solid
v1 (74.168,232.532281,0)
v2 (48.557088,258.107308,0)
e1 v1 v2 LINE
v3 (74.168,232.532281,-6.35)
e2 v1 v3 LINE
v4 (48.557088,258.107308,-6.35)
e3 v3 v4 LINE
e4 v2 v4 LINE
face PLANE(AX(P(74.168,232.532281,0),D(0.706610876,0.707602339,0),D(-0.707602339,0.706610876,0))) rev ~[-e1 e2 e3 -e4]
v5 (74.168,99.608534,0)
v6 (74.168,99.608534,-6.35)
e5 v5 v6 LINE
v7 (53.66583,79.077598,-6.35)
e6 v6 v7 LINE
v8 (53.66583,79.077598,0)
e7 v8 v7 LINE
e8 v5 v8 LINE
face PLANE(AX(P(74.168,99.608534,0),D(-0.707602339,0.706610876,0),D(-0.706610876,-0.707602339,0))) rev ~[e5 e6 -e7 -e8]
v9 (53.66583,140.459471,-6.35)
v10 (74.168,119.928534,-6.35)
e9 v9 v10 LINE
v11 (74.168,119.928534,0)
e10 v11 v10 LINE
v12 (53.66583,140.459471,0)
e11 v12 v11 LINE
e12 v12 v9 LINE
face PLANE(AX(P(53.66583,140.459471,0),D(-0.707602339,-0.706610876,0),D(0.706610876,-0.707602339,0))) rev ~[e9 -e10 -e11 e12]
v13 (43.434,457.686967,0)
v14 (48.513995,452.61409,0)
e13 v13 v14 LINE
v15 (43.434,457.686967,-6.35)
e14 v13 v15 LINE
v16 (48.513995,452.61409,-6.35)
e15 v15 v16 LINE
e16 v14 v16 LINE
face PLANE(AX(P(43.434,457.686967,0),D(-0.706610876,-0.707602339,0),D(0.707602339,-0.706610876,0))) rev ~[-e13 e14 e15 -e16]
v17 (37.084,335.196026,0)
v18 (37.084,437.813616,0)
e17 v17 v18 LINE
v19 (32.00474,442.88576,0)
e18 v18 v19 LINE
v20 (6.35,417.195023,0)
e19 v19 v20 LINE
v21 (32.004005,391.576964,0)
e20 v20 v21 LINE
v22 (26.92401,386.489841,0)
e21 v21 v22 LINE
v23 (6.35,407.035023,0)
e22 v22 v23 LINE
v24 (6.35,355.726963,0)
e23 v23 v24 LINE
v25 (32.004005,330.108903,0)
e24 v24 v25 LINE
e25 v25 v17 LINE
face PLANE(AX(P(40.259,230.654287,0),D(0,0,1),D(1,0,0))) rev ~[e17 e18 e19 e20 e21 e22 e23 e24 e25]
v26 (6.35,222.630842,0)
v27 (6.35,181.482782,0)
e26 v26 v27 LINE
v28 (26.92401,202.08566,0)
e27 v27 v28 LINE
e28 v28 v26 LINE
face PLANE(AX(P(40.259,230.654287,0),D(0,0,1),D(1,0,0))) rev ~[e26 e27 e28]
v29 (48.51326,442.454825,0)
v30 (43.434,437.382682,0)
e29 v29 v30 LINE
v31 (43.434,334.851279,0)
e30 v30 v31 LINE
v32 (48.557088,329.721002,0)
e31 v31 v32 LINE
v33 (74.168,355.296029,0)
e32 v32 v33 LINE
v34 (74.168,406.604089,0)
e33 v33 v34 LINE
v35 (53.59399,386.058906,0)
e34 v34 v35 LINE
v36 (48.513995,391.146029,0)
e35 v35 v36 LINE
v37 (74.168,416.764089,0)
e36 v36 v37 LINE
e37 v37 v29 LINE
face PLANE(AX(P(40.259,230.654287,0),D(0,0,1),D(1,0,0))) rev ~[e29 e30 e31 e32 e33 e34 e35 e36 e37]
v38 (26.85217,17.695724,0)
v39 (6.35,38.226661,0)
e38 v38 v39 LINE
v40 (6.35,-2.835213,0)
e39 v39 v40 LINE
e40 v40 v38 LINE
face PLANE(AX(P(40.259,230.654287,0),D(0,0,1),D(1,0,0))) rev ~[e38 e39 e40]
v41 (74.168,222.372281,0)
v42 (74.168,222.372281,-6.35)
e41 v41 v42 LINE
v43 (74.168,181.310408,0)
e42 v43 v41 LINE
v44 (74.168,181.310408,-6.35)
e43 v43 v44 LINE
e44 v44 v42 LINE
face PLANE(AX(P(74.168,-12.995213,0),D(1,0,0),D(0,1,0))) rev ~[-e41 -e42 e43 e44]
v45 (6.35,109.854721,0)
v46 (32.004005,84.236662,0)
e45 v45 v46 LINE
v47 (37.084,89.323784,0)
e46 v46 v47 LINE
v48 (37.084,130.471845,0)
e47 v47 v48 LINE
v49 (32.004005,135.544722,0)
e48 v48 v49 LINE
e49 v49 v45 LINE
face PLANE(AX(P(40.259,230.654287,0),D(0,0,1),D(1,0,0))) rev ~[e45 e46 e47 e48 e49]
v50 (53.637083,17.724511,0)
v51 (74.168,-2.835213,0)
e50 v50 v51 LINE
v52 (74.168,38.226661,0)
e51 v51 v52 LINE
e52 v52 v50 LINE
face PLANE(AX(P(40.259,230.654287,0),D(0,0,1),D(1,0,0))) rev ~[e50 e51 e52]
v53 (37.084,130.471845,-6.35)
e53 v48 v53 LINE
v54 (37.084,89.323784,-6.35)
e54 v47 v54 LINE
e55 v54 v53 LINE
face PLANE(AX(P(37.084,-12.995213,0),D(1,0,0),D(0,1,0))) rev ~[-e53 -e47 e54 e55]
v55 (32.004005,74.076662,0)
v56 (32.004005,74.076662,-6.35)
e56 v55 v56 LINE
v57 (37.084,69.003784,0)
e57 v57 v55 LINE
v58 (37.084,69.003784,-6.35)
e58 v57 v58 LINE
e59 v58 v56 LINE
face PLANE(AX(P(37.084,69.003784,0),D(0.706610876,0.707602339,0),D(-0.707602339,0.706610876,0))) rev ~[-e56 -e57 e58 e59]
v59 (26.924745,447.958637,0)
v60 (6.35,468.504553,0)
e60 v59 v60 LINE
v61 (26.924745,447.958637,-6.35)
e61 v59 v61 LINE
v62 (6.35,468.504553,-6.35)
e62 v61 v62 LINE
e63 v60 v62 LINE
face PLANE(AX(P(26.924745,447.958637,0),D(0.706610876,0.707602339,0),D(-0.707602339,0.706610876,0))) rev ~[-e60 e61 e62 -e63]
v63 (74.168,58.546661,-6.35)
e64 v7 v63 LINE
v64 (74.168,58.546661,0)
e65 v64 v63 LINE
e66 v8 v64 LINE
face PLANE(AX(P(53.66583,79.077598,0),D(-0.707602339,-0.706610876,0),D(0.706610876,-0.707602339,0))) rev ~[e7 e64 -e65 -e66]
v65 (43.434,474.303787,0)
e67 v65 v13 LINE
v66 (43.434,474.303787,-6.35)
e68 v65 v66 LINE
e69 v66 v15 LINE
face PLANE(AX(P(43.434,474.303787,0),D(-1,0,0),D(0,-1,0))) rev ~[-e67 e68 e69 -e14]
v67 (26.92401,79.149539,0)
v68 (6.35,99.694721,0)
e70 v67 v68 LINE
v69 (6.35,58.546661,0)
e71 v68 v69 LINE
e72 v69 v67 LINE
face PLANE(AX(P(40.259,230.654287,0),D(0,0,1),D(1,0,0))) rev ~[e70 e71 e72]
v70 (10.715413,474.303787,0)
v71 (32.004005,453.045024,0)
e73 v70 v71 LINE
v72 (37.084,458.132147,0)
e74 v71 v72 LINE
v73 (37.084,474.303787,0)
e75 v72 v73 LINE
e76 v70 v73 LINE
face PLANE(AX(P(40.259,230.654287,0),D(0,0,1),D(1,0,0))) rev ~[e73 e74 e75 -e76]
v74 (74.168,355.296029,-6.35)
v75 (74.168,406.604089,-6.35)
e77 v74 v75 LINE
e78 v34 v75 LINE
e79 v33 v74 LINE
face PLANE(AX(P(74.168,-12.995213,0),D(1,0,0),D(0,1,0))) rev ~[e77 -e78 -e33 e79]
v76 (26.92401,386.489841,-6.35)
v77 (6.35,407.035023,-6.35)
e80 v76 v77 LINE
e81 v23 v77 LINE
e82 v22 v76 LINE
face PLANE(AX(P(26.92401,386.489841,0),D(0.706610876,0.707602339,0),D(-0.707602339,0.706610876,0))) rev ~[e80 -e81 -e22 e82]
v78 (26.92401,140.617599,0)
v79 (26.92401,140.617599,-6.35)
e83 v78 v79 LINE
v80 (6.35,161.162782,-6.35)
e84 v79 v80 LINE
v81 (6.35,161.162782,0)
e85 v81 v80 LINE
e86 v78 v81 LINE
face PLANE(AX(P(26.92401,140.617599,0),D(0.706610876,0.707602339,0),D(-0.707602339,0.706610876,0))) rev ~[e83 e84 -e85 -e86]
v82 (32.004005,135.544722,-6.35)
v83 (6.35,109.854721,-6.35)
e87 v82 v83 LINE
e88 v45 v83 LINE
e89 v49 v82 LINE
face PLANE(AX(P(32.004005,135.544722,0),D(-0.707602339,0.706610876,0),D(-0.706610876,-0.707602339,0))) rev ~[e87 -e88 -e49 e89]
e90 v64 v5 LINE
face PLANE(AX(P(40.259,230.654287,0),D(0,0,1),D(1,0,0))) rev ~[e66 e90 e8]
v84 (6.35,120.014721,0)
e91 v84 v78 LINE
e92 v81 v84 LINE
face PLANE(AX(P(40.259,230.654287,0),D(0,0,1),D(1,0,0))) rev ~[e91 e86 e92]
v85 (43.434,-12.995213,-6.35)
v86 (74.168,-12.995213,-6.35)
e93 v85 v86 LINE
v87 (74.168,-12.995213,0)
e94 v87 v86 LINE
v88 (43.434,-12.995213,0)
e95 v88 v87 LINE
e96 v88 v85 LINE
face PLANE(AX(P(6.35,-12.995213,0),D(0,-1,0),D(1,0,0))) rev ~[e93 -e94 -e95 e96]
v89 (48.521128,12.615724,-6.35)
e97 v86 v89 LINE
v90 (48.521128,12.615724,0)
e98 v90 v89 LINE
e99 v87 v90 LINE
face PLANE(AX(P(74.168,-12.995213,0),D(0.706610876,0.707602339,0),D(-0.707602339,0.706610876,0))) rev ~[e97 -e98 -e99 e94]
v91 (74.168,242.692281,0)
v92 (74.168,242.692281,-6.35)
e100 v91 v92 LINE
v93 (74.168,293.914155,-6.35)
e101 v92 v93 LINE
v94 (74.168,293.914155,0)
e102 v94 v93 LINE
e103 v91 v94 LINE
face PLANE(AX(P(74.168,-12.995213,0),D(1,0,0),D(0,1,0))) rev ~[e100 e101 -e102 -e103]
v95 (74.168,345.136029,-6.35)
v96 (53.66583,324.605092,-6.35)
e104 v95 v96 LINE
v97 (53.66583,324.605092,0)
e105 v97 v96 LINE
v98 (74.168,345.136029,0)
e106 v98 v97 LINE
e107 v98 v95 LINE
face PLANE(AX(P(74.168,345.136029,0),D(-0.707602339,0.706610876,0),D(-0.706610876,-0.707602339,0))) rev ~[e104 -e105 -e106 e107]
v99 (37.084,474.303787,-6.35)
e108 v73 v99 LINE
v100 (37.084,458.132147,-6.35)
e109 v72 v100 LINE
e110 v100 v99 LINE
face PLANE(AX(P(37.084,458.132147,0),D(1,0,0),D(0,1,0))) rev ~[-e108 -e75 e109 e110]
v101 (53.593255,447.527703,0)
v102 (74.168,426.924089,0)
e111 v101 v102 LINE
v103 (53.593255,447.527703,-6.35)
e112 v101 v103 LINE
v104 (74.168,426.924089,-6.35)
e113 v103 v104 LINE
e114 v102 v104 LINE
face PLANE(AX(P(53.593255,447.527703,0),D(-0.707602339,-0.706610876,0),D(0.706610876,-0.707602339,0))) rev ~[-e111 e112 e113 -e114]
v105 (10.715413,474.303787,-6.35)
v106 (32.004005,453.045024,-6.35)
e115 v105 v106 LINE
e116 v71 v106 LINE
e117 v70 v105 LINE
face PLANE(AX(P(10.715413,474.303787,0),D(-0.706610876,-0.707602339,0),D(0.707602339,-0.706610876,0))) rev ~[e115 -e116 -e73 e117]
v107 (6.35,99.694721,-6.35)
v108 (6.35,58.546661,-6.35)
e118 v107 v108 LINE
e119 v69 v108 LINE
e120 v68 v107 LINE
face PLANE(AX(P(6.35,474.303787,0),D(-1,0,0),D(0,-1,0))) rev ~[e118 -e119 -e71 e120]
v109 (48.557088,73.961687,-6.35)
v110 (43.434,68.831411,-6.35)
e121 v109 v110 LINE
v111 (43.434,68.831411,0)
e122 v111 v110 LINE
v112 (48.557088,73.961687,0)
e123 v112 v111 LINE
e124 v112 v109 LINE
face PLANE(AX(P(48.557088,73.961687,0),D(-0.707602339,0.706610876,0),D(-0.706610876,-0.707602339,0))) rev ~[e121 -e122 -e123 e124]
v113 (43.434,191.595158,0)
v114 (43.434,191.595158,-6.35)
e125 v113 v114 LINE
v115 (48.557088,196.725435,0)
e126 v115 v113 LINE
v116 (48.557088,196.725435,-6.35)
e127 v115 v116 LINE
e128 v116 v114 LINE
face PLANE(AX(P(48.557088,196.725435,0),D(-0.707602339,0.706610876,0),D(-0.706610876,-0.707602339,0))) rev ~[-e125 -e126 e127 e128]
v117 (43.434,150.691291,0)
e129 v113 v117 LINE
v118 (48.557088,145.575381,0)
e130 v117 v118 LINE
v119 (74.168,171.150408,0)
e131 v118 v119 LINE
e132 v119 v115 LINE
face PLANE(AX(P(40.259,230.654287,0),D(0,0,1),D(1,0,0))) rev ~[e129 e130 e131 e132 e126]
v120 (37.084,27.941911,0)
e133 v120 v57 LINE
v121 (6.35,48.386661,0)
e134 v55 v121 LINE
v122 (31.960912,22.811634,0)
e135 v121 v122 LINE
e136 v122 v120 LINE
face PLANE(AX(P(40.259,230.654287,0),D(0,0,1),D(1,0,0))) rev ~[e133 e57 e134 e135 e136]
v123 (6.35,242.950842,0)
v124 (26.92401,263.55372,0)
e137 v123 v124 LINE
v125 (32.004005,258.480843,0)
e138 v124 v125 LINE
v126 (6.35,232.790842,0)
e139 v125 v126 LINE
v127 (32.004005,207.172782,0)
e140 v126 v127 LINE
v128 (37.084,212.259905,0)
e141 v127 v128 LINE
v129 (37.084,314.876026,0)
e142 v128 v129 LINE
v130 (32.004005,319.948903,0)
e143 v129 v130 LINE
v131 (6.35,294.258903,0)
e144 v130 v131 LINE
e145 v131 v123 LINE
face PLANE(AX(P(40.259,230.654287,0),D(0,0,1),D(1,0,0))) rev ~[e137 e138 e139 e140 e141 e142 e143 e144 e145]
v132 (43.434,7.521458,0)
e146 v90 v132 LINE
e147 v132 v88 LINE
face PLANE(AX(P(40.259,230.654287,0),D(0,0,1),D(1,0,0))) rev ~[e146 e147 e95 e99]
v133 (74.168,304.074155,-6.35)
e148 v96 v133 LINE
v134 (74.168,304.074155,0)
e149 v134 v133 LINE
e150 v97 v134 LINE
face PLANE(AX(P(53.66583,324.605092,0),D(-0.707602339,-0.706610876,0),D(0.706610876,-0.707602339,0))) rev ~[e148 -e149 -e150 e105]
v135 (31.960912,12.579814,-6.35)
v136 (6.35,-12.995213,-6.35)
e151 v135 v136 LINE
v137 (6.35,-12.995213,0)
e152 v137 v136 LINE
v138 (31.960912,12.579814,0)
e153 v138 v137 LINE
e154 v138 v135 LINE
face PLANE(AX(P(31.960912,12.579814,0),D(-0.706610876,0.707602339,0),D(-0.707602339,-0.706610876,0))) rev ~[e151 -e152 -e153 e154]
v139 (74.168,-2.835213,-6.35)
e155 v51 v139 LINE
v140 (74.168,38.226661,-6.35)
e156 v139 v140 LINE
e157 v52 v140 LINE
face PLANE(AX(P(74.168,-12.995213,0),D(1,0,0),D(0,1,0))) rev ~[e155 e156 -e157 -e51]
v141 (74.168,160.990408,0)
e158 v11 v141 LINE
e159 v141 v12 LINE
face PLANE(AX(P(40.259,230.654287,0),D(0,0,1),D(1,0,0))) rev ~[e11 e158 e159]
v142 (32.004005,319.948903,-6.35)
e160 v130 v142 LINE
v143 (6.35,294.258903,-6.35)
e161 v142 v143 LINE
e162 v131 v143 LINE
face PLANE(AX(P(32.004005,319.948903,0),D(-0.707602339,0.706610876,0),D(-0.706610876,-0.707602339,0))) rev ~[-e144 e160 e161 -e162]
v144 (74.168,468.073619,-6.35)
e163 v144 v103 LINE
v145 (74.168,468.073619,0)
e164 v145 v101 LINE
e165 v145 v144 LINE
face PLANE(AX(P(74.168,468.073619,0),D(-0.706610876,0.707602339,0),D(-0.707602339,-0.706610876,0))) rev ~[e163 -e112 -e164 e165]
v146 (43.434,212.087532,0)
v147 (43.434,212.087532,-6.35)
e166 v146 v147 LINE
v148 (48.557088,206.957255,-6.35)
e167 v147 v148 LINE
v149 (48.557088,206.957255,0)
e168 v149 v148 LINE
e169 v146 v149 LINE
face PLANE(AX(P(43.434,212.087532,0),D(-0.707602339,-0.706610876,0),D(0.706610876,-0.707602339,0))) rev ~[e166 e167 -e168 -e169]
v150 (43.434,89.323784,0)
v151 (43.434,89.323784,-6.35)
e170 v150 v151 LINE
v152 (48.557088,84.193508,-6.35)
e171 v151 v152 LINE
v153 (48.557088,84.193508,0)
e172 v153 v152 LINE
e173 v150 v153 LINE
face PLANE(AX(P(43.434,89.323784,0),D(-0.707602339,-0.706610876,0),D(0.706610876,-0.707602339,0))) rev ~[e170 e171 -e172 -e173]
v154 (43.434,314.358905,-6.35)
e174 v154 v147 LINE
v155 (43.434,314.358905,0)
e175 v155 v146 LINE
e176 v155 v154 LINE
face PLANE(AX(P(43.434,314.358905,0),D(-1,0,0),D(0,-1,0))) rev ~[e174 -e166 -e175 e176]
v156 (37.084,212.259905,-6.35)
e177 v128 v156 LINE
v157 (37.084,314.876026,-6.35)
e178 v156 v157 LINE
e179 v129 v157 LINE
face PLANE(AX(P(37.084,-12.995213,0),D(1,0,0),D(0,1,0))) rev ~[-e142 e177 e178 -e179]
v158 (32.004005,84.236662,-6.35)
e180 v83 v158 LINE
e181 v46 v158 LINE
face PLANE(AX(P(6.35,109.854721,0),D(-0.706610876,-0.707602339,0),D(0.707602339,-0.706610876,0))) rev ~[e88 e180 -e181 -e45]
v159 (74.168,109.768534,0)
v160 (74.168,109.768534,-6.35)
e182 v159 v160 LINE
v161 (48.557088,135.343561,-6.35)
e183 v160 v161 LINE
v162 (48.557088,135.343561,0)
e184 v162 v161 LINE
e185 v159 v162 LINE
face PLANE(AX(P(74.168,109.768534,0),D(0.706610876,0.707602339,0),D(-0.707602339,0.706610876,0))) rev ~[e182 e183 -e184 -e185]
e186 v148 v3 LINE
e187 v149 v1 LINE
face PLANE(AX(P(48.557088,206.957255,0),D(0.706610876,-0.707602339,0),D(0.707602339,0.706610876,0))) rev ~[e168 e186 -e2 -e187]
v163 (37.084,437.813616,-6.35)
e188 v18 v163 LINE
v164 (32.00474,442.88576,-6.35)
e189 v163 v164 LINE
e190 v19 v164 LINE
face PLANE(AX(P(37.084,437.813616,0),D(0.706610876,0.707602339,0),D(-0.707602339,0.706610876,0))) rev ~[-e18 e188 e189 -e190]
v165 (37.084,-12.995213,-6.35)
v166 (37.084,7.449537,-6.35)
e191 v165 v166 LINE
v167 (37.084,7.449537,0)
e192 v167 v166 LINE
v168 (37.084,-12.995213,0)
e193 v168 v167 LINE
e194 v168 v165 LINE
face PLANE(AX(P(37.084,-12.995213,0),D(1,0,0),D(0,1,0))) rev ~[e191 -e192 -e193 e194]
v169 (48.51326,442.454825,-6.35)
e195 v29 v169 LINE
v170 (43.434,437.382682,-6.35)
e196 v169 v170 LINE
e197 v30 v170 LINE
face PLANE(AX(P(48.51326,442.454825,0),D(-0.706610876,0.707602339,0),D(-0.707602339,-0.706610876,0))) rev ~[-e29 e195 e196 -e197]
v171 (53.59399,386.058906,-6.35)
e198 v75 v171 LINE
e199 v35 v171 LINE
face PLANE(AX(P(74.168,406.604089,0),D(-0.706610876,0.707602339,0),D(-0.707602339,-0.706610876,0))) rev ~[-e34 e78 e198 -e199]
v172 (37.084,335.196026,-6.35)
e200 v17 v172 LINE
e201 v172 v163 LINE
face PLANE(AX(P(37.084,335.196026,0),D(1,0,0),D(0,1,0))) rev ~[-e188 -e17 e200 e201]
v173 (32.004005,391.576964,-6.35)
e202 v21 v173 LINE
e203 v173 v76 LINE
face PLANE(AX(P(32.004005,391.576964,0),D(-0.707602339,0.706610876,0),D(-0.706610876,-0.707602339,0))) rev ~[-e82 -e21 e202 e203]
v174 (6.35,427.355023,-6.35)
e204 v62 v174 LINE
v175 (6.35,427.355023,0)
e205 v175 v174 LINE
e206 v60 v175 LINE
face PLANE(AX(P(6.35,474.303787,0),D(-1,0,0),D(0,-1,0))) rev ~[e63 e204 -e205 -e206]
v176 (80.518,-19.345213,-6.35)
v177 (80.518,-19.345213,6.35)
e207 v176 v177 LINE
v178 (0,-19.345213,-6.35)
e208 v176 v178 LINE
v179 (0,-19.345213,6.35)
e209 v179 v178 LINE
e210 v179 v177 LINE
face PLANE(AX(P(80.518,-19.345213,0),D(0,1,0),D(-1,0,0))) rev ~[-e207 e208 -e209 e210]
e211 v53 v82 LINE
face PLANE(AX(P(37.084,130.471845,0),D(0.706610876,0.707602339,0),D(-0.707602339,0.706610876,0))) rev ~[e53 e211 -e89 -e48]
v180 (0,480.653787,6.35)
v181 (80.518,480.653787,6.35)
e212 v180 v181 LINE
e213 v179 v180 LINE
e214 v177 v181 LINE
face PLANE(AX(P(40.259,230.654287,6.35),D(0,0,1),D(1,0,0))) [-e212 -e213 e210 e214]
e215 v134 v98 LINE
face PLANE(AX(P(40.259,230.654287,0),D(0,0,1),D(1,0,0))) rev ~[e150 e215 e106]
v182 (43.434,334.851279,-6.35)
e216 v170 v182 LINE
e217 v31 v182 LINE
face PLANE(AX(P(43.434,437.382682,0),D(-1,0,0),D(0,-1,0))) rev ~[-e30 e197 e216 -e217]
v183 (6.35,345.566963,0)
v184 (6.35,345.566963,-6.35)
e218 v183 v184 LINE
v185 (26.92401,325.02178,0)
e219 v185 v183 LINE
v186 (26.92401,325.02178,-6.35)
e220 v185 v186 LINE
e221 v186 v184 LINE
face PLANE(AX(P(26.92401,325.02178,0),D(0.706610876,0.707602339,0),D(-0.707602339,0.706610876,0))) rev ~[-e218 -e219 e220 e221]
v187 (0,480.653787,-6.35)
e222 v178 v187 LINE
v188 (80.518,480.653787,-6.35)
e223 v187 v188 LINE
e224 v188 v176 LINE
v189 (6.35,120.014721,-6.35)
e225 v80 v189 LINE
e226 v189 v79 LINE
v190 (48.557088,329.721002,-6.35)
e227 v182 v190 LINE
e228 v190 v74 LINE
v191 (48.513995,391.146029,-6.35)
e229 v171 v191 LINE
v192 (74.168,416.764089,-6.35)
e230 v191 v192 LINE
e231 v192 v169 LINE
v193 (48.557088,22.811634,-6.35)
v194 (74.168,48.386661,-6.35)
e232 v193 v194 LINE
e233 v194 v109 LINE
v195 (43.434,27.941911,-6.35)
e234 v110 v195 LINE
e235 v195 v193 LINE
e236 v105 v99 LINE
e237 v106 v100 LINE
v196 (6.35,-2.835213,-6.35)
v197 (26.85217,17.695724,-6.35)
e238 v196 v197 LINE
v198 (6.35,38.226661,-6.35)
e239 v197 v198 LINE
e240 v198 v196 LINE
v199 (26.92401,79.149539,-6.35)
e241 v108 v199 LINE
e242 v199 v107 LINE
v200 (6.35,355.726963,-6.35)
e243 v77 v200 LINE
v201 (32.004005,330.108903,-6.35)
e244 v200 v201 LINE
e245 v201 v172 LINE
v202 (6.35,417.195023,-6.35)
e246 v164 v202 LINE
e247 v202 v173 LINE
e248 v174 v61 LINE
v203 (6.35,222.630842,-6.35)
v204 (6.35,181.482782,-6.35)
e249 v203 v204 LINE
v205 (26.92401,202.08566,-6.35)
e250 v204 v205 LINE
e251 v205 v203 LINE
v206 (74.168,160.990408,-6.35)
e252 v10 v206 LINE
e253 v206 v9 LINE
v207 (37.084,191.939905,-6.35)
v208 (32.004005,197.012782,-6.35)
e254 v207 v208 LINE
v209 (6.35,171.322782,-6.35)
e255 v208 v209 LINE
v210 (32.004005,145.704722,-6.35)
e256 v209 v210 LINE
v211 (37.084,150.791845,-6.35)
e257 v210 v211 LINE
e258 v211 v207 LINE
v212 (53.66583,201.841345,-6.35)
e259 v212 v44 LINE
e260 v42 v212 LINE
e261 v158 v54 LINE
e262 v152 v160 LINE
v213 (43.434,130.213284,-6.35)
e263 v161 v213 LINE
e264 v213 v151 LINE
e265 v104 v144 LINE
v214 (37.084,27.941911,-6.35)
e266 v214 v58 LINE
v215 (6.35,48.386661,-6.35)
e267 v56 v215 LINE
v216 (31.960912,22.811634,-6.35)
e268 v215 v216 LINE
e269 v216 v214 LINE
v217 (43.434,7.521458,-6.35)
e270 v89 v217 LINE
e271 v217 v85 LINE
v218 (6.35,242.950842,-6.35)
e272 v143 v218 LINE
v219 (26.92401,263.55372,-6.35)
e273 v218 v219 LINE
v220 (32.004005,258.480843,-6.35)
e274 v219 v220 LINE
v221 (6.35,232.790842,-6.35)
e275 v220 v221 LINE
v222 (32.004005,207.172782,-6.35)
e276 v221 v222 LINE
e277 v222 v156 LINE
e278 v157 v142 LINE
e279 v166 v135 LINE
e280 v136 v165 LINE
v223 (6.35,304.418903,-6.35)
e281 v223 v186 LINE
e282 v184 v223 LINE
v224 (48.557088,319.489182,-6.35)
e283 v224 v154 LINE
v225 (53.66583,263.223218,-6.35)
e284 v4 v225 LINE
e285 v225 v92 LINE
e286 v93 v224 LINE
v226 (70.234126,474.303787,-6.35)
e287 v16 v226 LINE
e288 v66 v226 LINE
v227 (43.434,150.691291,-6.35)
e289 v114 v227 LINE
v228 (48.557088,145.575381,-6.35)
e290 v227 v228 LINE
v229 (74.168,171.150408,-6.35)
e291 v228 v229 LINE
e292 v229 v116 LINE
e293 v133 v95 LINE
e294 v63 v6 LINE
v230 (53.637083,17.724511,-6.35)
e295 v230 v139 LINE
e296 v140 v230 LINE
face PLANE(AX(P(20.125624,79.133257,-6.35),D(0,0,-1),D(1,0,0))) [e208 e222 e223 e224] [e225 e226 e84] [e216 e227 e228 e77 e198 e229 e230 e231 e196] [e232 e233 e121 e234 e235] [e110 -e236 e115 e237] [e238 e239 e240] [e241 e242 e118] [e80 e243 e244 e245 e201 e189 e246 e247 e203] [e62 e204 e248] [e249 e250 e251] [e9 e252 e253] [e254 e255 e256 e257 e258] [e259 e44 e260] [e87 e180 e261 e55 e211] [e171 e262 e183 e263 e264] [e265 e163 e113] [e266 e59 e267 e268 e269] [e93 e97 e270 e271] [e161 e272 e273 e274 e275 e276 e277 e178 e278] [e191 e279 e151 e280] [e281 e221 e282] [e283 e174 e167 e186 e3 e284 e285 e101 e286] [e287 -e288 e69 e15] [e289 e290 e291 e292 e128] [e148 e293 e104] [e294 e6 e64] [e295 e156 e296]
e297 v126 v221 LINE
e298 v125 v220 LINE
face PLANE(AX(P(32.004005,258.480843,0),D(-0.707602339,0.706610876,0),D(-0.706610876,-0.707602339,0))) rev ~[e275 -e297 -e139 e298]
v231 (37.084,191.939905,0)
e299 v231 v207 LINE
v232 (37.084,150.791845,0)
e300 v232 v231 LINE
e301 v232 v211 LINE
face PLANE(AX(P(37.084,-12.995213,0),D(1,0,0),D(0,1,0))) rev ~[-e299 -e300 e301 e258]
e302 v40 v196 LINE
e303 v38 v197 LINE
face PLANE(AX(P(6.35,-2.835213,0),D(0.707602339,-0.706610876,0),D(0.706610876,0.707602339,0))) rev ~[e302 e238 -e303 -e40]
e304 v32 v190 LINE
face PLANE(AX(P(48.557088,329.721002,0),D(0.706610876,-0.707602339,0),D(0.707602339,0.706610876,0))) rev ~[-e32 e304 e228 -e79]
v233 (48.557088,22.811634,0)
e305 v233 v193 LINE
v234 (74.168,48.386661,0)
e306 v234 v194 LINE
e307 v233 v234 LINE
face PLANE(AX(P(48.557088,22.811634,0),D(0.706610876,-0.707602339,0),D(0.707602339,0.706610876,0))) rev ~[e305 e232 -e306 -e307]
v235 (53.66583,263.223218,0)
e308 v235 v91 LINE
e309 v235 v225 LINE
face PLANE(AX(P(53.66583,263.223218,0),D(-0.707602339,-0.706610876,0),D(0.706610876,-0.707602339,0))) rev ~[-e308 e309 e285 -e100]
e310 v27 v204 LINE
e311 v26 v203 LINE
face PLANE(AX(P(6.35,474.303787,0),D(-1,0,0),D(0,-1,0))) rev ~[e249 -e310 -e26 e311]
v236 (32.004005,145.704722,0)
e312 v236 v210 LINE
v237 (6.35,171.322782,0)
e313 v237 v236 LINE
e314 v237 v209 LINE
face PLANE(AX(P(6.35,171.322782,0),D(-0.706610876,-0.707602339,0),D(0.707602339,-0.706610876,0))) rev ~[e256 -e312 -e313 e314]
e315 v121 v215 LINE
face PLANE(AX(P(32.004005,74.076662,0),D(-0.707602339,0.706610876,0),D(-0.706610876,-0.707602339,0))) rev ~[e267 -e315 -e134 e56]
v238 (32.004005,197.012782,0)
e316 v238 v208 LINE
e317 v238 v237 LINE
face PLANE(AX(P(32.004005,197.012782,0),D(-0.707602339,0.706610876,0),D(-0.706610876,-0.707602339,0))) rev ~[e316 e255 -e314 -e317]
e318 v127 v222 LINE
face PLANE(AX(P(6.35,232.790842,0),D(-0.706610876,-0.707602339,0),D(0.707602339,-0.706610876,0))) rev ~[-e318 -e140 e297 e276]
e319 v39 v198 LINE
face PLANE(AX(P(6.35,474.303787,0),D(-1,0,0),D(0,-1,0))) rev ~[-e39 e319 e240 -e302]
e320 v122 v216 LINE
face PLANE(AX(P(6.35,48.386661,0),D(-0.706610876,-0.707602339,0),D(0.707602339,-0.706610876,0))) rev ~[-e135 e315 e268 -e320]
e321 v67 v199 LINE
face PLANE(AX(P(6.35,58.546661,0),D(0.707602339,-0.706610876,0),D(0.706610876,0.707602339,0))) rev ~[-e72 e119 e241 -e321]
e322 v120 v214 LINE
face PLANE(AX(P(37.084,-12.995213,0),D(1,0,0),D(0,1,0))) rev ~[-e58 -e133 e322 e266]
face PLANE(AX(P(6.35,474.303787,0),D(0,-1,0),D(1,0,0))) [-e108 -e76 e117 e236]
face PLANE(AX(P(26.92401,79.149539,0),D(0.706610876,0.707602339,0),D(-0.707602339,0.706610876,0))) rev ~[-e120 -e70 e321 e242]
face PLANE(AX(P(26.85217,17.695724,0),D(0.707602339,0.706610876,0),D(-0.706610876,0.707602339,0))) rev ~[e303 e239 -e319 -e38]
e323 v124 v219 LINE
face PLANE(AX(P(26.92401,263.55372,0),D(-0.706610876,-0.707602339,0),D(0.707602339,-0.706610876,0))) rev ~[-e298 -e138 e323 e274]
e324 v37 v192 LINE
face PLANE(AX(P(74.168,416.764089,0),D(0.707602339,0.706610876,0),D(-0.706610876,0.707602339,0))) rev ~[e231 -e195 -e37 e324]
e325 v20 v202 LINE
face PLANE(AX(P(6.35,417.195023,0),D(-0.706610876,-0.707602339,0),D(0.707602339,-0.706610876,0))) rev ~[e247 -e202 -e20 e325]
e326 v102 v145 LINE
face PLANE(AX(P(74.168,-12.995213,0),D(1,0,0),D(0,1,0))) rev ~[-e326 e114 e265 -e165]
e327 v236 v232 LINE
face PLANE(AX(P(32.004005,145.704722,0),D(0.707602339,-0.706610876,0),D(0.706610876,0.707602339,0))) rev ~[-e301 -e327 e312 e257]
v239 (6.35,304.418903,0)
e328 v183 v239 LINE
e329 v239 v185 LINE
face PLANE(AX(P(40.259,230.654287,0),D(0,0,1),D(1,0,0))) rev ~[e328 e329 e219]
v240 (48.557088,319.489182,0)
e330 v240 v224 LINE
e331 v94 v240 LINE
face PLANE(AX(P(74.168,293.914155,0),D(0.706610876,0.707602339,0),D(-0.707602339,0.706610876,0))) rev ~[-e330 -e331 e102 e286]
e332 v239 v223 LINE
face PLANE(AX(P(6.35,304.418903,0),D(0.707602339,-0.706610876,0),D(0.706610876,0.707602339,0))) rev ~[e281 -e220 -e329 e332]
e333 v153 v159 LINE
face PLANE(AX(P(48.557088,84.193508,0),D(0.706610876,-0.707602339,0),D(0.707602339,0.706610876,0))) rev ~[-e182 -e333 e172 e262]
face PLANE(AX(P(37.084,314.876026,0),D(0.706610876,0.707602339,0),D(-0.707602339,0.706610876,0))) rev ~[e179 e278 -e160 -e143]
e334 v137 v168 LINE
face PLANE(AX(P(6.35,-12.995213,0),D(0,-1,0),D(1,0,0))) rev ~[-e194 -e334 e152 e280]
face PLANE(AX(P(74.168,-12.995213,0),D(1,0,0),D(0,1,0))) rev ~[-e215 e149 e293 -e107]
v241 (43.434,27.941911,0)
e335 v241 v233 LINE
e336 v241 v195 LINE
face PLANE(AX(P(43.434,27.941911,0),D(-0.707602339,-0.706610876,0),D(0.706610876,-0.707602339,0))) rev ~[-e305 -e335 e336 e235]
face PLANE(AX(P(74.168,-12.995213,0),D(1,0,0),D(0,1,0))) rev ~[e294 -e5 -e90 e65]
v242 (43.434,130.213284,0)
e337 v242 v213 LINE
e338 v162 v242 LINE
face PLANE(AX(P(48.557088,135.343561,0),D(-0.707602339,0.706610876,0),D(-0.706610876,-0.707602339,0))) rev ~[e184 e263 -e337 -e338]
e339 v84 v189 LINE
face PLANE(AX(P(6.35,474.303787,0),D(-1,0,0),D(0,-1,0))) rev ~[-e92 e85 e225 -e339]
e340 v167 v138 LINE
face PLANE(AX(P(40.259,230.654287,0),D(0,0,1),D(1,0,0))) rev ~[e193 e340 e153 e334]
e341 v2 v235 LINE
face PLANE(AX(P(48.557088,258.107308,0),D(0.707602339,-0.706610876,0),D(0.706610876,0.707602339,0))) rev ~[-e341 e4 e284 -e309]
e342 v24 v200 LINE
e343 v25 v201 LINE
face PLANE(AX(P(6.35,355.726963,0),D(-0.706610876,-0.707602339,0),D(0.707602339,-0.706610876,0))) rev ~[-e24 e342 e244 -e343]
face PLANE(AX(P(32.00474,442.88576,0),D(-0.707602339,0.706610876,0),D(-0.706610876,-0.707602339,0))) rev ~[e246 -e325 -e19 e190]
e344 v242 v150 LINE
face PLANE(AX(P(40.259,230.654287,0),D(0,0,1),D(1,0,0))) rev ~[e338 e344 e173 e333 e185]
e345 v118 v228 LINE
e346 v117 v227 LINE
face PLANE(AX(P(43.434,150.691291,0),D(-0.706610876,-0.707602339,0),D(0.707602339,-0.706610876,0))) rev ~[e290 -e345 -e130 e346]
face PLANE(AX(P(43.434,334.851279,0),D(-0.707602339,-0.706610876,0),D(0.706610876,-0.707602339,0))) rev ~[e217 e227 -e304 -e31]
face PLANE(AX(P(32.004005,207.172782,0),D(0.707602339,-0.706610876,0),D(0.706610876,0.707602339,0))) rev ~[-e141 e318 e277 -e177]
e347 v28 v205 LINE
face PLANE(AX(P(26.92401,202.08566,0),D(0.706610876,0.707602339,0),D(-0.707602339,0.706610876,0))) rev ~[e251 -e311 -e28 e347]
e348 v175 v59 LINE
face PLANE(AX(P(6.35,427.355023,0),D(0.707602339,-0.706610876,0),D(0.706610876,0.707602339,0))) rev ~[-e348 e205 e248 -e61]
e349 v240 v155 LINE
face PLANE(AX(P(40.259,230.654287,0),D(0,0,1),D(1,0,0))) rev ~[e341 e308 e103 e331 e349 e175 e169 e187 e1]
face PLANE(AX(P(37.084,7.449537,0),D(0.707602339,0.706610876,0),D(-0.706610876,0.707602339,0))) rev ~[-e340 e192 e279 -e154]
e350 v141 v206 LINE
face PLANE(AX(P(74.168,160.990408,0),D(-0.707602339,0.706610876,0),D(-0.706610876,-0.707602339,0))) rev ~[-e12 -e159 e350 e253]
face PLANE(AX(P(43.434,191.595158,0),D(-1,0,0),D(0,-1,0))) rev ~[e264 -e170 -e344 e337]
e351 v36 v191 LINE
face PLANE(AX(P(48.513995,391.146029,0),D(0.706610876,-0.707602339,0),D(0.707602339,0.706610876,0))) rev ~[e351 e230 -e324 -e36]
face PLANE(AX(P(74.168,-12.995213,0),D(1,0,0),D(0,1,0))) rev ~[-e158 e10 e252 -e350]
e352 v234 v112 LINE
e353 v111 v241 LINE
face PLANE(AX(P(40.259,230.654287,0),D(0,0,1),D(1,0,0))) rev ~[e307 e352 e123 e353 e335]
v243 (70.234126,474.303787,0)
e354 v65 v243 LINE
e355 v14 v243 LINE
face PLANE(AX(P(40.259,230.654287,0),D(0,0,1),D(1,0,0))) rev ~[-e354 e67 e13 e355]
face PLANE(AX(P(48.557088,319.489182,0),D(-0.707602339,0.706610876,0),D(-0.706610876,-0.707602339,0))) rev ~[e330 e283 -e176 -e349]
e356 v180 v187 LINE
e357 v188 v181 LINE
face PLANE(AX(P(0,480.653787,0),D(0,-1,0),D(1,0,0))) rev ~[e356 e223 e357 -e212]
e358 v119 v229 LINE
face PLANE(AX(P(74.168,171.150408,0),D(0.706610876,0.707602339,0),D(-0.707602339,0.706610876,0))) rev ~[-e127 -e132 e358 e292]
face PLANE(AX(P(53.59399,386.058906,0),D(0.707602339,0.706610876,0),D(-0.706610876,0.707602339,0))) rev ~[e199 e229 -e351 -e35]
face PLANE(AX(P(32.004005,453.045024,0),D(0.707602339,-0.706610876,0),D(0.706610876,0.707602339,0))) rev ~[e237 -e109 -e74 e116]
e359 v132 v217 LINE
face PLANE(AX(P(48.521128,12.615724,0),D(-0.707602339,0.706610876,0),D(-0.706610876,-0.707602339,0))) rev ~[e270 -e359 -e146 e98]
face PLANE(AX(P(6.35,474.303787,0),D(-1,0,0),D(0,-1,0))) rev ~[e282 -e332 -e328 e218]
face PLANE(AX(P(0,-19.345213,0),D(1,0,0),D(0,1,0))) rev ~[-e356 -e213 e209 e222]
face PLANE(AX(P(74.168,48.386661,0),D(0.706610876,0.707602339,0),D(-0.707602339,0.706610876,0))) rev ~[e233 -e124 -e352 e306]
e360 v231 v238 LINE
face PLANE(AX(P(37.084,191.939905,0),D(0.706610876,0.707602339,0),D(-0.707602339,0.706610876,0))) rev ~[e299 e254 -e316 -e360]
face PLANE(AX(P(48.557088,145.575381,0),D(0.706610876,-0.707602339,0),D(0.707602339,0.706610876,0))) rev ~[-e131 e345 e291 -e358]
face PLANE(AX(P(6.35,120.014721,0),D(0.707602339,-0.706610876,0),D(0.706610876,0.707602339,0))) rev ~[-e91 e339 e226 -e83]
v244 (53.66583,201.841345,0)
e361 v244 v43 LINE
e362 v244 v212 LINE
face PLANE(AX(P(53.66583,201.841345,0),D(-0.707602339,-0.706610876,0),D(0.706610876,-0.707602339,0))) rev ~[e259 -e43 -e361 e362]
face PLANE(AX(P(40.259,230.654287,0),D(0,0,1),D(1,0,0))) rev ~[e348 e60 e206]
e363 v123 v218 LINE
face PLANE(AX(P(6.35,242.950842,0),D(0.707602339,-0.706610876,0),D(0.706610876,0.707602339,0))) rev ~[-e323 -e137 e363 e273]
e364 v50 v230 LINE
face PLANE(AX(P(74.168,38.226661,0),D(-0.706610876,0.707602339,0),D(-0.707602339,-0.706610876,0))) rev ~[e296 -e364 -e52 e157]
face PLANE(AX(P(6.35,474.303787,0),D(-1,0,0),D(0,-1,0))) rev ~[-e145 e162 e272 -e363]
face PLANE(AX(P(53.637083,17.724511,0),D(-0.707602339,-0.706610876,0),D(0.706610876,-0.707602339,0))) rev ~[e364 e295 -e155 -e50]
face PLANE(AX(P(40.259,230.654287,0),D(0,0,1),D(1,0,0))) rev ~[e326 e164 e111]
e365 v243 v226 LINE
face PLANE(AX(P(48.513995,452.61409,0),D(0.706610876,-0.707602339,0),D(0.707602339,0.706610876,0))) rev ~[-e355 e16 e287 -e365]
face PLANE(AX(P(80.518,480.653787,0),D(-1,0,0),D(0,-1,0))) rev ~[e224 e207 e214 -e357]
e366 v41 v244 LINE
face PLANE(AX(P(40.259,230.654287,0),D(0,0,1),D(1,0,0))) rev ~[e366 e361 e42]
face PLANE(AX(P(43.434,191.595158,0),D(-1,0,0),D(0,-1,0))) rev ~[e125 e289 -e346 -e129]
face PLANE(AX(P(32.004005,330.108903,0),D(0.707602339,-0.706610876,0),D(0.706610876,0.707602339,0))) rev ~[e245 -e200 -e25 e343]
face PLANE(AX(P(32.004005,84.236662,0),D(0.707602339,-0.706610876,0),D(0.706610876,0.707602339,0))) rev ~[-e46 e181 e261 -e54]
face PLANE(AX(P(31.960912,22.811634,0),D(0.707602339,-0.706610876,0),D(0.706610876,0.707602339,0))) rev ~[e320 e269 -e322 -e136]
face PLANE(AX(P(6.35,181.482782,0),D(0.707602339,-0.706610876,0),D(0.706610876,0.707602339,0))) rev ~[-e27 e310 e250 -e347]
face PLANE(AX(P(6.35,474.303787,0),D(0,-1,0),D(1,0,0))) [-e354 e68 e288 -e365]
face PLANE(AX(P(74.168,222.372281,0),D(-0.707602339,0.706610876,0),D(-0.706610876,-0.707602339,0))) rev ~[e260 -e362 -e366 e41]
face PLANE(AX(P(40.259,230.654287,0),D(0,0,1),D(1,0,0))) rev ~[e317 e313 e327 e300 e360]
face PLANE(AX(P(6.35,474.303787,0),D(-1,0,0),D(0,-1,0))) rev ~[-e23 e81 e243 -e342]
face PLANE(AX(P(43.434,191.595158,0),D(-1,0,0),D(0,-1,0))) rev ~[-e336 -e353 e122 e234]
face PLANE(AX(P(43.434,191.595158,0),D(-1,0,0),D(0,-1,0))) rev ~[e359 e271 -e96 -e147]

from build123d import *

# Parameters (mm, degrees)
F0_W     = 80.518
F0_H     = 499.999
F1_DEPTH = 6.35
F2_W     = 67.818
F2_H     = 6.35
F3_DEPTH = 6.35
F5_DEPTH = 6.35
F6_DEPTH = 6.35
F7_DEPTH = 6.35


# Not quite as in the source:
# - a feature names something its author has since deleted; it is built from what else it names


with BuildPart() as f1:
    # F0 (on Top) → F1 (new body)
    with BuildSketch(Plane.XY):
        with Locations((40.259, 230.6542872722)):
            Rectangle(F0_W, F0_H)
    extrude(amount=F1_DEPTH)

    # F2 (on face) → F3 (join)
    with BuildSketch(Plane(origin=(0, 0, 0), x_dir=(1, 0, 0), z_dir=(0, 0, -1))):
        Polygon((80.518, 19.3452127278), (74.168, 19.3452127278), (74.168, 12.9952127278), (74.168, -474.3037872722), (74.168, -480.6537872722), (80.518, -480.6537872722), align=None)
        Polygon((6.35, 19.3452127278), (0, 19.3452127278), (0, -480.6537872722), (6.35, -480.6537872722), (6.35, -474.3037872722), (6.35, 12.9952127278), align=None)
        with Locations((40.259, 16.1702127278)):
            Rectangle(F2_W, F2_H)
        with Locations((40.259, -477.4787872722)):
            Rectangle(F2_W, F2_H)
    extrude(amount=F3_DEPTH)

    # F4 (on face) → F5 (join)
    with BuildSketch(Plane(origin=(0, 0, 0), x_dir=(1, 0, 0), z_dir=(0, 0, -1))):
        Polygon((43.434, 12.9952127278), (37.084, 12.9952127278), (37.084, -7.4495371679), (37.084, -27.9419109224), (37.084, -69.0037844682), (37.084, -89.3237844682), (37.084, -130.4718448913), (37.084, -150.7918448913), (37.084, -191.9399053144), (37.084, -212.2599053144), (37.084, -253.4079657375), (37.084, -263.5679657375), (37.084, -273.7279657375), (37.084, -314.8760261606), (37.084, -335.1960261606), (37.084, -376.3440865837), (37.084, -386.5040865837), (37.084, -396.6640865837), (37.084, -437.8136164283), (37.084, -458.1321470068), (37.084, -474.3037872722), (43.434, -474.3037872722), (43.434, -457.6869668698), (43.434, -437.3826820421), (43.434, -396.2331521975), (43.434, -386.0731521975), (43.434, -375.9131521975), (43.434, -334.8512786517), (43.434, -314.3589048972), (43.434, -273.4694051058), (43.434, -263.2232182286), (43.434, -252.9770313513), (43.434, -212.08753156), (43.434, -191.5951578055), (43.434, -150.6912914171), (43.434, -130.2132842596), (43.434, -89.3237844682), (43.434, -68.8314107138), (43.434, -27.9419109224), (43.434, -7.5214582917), align=None)
        Polygon((48.5570884026, -319.4891816343), (43.434, -314.3589048972), (43.434, -334.8512786517), (48.5570884026, -329.7210019146), (74.168, -355.2960285474), (74.168, -345.1360285474), (53.6658303382, -324.6050917744), (74.168, -304.0741550015), (74.168, -293.9141550015), align=None)
        Polygon((48.5132602963, -442.4548254861), (43.434, -437.3826820421), (43.434, -457.6869668698), (48.5139950064, -452.6140897452), (70.2341258947, -474.3037872722), (74.168, -474.3037872722), (74.168, -468.0736188151), (53.5932553027, -447.5277026107), (74.168, -426.9240889705), (74.168, -416.7640889705), align=None)
        Polygon((37.084, -458.1321470068), (37.084, -437.8136164283), (32.0047397037, -442.8857598723), (6.35, -417.1950233567), (6.35, -427.3550233567), (26.9247446973, -447.9586369969), (6.35, -468.5045532013), (6.35, -474.3037872722), (10.7154131464, -474.3037872722), (32.0040049936, -453.0450241314), align=None)
        Polygon((6.35, -417.1950233567), (32.0040049936, -391.5769637083), (26.9240099873, -386.4898408329), (6.35, -407.0350233567), align=None)
        Polygon((53.5939900127, -386.0589064467), (48.5139950064, -391.1460293221), (74.168, -416.7640889705), (74.168, -406.6040889705), align=None)
        Polygon((48.5570884026, -196.7254345426), (43.434, -191.5951578055), (43.434, -212.08753156), (48.5570884026, -206.9572548229), (74.168, -232.5322814557), (74.168, -222.3722814557), (53.6658303382, -201.8413446827), (74.168, -181.3104079098), (74.168, -171.1504079098), align=None)
        Polygon((74.168, -232.5322814557), (48.5570884026, -258.1073080885), (53.6658303382, -263.2232182286), (74.168, -242.6922814557), align=None)
        Polygon((37.084, -335.1960261606), (37.084, -314.8760261606), (32.0040049936, -319.9489032852), (6.35, -294.2589025105), (6.35, -304.4189025105), (26.9240099873, -325.0217804098), (6.35, -345.5669629336), (6.35, -355.7269629336), (32.0040049936, -330.1089032852), align=None)
        Polygon((26.9240099873, -263.5537199867), (32.0040049936, -258.4808428621), (6.35, -232.7908420874), (6.35, -242.9508420874), align=None)
    extrude(amount=F5_DEPTH)

    # F4 (on face) → F6 (join)
    with BuildSketch(Plane(origin=(0, 0, 0), x_dir=(1, 0, 0), z_dir=(0, 0, -1))):
        Polygon((37.084, -150.7918448913), (37.084, -130.4718448913), (32.0040049936, -135.5447220159), (6.35, -109.8547212412), (6.35, -120.0147212412), (26.9240099873, -140.6175991405), (6.35, -161.1627816643), (6.35, -171.3227816643), (32.0040049936, -145.7047220159), align=None)
        Polygon((48.5570884026, -135.3435609967), (43.434, -130.2132842596), (43.434, -150.6912914171), (48.5570884026, -145.575381277), (74.168, -171.1504079098), (74.168, -160.9904079098), (53.6658303382, -140.4594711369), (74.168, -119.9285343639), (74.168, -109.7685343639), align=None)
        Polygon((31.9609115974, -12.579813905), (6.35, 12.9952127278), (6.35, 2.8352127278), (26.8521696618, -17.6957240451), (6.35, -38.2266608181), (6.35, -48.3866608181), (31.9609115974, -22.8116341853), (37.084, -27.9419109224), (37.084, -7.4495371679), align=None)
        Polygon((74.168, 2.8352127278), (74.168, 12.9952127278), (48.5211278761, -12.6157240451), (43.434, -7.5214582917), (43.434, -27.9419109224), (48.5570884026, -22.8116341853), (74.168, -48.3866608181), (74.168, -38.2266608181), (53.637083409, -17.7245113099), align=None)
        Polygon((48.5570884026, -73.9616874509), (43.434, -68.8314107138), (43.434, -89.3237844682), (48.5570884026, -84.1935077311), (74.168, -109.7685343639), (74.168, -99.6085343639), (53.6658303382, -79.077597591), (74.168, -58.5466608181), (74.168, -48.3866608181), align=None)
    extrude(amount=F6_DEPTH)

    # F4 (on face) → F7 (join)
    with BuildSketch(Plane(origin=(0, 0, 0), x_dir=(1, 0, 0), z_dir=(0, 0, -1))):
        Polygon((32.0040049936, -74.0766615928), (6.35, -48.3866608181), (6.35, -58.5466608181), (26.9240099873, -79.1495387174), (6.35, -99.6947212412), (6.35, -109.8547212412), (32.0040049936, -84.2366615928), (37.084, -89.3237844682), (37.084, -69.0037844682), align=None)
        Polygon((37.084, -212.2599053144), (37.084, -191.9399053144), (32.0040049936, -197.012782439), (6.35, -171.3227816643), (6.35, -181.4827816643), (26.9240099873, -202.0856595636), (6.35, -222.6308420874), (6.35, -232.7908420874), (32.0040049936, -207.172782439), align=None)
    extrude(amount=F7_DEPTH)


solid = f1.part
